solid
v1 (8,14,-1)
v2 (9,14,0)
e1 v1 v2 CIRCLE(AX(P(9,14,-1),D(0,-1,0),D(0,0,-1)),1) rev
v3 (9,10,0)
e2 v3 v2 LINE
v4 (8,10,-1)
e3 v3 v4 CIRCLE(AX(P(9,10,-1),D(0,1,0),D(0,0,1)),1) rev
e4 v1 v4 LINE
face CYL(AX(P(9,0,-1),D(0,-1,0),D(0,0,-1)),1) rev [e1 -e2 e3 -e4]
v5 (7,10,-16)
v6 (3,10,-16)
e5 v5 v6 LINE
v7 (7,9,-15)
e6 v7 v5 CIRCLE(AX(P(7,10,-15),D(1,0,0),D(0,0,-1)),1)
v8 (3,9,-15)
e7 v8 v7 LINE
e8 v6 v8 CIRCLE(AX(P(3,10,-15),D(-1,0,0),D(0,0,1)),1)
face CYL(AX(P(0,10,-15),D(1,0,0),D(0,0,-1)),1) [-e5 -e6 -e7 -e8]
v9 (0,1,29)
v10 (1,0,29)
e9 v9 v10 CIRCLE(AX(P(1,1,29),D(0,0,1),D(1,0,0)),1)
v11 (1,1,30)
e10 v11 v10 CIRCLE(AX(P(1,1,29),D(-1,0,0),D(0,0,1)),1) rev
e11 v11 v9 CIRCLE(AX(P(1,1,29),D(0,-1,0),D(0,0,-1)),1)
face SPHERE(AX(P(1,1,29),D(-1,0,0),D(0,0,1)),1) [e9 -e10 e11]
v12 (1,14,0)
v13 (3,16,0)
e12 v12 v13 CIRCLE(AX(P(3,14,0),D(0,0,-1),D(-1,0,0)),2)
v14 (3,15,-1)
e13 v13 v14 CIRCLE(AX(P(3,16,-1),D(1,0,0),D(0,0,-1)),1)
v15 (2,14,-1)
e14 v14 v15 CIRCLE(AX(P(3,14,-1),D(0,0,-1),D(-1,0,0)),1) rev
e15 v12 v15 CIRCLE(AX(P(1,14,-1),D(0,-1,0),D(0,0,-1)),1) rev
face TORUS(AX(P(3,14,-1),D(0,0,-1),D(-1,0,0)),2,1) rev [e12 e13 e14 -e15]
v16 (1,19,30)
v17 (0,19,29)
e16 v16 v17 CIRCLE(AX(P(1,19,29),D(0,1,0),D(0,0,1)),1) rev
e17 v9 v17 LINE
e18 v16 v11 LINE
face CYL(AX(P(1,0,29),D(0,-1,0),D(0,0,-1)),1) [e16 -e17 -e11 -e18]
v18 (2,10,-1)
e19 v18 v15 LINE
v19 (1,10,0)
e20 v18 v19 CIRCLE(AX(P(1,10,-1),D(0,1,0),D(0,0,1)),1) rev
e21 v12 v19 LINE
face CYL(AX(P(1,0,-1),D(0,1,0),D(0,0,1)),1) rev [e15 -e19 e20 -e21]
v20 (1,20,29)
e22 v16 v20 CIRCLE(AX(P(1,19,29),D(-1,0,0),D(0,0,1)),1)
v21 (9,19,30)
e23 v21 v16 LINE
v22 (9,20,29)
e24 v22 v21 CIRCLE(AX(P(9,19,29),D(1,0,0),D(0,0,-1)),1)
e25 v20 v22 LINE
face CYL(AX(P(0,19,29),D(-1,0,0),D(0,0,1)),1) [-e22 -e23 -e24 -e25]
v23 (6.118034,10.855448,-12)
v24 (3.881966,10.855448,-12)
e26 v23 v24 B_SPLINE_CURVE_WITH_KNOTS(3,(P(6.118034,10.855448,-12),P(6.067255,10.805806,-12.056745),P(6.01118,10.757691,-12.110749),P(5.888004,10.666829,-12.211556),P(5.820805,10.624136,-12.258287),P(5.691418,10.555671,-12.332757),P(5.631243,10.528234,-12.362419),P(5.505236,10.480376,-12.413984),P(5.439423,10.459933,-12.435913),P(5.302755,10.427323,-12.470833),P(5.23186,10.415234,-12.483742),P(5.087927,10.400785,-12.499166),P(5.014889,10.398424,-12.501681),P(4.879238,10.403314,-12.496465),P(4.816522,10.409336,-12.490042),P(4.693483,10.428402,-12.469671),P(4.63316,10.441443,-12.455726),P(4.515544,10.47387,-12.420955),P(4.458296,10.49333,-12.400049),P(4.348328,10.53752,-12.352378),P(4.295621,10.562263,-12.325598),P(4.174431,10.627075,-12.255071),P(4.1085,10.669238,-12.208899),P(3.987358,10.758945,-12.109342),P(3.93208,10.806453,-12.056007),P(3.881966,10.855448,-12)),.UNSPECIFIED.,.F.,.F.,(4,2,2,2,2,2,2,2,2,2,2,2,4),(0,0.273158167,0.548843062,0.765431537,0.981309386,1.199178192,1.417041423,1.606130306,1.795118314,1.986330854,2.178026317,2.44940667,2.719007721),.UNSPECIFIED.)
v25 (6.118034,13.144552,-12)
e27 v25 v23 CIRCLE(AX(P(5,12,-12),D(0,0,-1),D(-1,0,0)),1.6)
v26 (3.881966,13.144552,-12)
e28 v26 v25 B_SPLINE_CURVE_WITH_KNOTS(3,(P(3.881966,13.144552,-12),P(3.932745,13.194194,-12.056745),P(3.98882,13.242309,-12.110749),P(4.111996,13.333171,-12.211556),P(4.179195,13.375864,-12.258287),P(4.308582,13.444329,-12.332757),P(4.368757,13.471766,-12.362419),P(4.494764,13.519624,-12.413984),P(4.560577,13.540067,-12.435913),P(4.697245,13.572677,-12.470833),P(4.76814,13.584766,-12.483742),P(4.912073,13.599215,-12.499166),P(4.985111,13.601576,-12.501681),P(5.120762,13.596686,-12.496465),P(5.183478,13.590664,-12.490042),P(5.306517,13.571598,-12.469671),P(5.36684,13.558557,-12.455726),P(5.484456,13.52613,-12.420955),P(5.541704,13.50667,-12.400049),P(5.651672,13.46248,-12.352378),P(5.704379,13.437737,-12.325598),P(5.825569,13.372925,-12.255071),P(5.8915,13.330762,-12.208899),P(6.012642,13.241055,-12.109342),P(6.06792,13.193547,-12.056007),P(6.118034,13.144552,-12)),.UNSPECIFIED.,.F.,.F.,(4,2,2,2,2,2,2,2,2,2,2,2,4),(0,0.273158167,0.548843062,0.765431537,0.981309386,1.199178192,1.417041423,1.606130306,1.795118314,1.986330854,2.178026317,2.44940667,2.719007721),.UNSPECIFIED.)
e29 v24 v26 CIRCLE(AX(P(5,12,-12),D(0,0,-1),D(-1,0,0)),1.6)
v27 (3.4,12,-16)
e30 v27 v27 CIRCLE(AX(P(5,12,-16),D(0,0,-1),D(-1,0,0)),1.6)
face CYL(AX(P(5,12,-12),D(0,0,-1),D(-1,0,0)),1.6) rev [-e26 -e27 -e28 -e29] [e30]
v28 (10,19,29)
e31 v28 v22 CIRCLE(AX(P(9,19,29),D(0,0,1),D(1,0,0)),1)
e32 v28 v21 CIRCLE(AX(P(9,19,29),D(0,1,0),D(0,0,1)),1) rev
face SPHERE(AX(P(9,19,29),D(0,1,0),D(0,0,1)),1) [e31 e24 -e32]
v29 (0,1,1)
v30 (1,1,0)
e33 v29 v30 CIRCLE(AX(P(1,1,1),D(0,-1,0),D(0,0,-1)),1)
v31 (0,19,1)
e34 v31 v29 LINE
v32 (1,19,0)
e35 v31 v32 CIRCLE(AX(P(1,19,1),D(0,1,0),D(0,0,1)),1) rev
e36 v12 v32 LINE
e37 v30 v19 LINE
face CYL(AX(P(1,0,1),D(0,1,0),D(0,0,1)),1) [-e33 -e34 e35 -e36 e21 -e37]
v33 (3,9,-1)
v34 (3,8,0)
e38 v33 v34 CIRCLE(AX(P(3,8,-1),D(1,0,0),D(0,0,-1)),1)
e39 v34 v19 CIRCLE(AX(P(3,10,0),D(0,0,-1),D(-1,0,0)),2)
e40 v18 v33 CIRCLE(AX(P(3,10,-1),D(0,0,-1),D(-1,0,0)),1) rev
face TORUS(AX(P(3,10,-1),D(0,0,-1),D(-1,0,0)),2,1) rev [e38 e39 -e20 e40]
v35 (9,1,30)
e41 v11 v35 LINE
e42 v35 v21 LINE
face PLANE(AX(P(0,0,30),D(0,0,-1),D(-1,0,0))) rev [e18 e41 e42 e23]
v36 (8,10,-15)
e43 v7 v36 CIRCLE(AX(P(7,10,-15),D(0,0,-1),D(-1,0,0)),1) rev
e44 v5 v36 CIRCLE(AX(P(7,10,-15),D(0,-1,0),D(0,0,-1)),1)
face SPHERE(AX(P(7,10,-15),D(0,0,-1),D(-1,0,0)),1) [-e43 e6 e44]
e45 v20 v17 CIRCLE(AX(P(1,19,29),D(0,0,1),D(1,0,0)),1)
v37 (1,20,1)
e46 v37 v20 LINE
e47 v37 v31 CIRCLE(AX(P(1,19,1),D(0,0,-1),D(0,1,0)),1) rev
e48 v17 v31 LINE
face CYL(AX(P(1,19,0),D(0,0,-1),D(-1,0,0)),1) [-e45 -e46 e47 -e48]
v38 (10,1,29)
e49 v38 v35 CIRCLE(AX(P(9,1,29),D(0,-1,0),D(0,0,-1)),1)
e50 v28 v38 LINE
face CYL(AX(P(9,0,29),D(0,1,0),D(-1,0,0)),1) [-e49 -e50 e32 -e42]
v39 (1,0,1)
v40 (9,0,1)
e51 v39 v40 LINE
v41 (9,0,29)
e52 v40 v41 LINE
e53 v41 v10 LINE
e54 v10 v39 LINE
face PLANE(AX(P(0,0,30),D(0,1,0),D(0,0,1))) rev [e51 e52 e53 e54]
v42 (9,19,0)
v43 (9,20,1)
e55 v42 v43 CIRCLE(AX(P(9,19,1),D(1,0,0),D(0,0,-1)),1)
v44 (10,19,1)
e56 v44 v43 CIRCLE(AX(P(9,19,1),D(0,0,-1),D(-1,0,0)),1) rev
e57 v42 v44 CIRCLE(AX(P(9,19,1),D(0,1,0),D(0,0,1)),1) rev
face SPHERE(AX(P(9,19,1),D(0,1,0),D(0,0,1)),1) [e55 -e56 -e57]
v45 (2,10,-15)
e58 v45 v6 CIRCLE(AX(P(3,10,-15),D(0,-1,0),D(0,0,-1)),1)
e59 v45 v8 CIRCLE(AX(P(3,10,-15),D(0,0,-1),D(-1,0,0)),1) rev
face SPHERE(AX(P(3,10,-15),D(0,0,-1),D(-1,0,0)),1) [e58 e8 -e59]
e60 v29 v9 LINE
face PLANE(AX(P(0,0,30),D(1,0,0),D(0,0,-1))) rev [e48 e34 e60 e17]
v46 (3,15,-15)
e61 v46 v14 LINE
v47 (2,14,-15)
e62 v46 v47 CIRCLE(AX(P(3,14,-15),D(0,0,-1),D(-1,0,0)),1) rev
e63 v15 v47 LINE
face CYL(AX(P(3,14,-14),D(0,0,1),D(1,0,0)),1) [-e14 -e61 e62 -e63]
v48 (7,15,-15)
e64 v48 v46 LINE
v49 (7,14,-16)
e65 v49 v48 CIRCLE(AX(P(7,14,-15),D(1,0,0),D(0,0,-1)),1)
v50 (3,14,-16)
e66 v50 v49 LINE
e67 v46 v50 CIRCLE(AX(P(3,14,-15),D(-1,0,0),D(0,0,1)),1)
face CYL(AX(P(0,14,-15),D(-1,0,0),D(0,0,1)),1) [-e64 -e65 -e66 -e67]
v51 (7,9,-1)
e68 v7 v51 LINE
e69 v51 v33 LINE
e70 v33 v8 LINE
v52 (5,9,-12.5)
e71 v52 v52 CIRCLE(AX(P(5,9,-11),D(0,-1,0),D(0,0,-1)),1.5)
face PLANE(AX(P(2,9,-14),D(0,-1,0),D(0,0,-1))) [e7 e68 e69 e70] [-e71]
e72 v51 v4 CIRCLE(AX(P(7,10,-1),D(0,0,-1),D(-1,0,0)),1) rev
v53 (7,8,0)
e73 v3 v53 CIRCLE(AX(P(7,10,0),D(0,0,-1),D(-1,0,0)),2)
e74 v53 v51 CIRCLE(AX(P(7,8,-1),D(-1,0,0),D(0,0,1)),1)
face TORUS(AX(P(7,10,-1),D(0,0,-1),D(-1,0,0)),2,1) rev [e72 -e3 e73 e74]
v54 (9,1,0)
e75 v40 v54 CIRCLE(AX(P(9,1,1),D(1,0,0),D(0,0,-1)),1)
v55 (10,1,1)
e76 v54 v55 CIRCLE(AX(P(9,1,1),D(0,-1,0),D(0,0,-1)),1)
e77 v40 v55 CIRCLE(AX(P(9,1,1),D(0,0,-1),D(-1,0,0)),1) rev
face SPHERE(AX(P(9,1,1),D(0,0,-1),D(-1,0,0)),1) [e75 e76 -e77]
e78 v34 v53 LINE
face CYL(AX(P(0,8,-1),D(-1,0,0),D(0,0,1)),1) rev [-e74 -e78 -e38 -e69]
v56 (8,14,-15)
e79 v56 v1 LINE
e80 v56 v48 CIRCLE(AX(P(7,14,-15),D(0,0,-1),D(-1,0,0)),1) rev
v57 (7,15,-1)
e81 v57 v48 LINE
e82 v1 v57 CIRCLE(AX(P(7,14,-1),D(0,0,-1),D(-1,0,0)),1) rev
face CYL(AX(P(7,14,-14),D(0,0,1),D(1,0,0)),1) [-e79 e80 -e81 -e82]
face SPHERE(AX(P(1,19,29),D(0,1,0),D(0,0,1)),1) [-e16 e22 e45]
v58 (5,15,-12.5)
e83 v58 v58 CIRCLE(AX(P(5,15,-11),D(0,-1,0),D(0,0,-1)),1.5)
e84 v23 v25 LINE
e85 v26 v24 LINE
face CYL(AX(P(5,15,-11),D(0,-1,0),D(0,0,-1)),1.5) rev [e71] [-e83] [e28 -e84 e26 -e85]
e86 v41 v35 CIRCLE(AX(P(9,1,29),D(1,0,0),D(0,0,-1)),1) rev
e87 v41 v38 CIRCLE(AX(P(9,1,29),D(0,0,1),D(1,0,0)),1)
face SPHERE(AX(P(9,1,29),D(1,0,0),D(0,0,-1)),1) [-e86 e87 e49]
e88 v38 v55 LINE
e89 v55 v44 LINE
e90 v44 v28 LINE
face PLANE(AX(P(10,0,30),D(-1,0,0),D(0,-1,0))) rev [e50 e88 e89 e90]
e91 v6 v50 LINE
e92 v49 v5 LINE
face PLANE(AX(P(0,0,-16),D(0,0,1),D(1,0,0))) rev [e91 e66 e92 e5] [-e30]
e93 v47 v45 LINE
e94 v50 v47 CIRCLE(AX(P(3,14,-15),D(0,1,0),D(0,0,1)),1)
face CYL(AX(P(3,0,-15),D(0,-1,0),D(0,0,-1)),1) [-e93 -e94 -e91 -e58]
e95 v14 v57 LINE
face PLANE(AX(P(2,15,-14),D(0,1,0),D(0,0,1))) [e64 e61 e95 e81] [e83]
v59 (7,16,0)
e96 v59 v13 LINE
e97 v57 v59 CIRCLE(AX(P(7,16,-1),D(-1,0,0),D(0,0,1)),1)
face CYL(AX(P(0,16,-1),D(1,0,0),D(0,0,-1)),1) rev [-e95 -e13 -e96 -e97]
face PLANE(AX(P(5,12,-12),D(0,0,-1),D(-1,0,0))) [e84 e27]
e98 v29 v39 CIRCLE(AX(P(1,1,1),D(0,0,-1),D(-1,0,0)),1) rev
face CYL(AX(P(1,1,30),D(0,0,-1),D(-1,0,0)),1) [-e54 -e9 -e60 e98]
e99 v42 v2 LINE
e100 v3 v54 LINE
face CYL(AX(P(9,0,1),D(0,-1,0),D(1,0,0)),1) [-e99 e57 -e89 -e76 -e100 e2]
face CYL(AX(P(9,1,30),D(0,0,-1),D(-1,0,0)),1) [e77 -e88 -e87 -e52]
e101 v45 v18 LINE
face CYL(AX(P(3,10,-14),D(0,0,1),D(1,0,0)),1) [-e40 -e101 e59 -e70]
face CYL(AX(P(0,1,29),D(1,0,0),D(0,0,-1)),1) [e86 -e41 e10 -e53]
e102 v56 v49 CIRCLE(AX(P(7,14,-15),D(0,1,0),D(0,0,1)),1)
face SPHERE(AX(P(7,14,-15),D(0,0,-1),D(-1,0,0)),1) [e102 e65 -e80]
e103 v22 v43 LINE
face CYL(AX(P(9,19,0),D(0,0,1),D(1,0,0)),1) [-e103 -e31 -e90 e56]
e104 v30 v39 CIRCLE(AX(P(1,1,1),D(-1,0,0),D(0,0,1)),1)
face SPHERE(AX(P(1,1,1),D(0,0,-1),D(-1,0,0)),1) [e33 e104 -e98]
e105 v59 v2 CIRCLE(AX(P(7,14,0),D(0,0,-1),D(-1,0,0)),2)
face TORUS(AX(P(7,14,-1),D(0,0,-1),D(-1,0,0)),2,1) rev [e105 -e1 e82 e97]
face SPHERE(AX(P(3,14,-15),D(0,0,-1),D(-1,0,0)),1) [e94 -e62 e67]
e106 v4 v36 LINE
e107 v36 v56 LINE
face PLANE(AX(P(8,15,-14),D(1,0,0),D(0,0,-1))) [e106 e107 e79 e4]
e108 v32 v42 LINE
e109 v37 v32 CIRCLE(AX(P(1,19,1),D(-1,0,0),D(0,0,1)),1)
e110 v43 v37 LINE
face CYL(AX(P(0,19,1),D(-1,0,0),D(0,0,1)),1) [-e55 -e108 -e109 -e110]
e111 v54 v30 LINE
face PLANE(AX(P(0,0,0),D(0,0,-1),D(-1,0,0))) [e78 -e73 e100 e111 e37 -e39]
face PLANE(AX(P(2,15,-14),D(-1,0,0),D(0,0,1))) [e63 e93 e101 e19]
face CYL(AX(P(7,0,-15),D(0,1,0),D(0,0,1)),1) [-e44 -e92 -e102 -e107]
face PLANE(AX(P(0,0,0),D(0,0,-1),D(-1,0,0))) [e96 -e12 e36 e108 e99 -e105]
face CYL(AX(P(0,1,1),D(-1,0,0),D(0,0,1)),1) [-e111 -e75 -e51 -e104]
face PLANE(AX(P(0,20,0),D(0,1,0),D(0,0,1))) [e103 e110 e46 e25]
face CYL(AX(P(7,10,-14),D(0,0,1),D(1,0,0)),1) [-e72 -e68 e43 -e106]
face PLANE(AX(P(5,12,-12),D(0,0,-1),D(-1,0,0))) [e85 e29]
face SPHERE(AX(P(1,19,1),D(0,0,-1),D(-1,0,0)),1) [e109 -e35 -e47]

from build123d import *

# Parameters (mm, degrees)
SKETCH_1_W          = 10
SKETCH_1_H          = 22
EXTRUDE_1_DEPTH     = 30
SKETCH_2_W          = 6
SKETCH_2_H          = 6
EXTRUDE_3_DEPTH     = 14
SKETCH_3_R          = 1.5
CUT_EXTRUDE_1_DEPTH = 6
SKETCH_6_W          = 10
SKETCH_6_H          = 30
CUT_EXTRUDE_2_DEPTH = 2
SKETCH_7_W          = 6
SKETCH_7_H          = 6
EXTRUDE_4_DEPTH     = 2
FILLET_1_R          = 1
SKETCH_8_R          = 1.6
CUT_EXTRUDE_3_DEPTH = 4


with BuildPart() as part:
    # 草图1 → 凸台-拉伸1 (new body)
    with BuildSketch(Plane.XY):
        with Locations((5, 11)):
            Rectangle(SKETCH_1_W, SKETCH_1_H)
    extrude(amount=EXTRUDE_1_DEPTH)

    # 草图2 → 凸台-拉伸3 (add)
    with BuildSketch(Plane.XY):
        with Locations((5, 12)):
            Rectangle(SKETCH_2_W, SKETCH_2_H)
    extrude(amount=-EXTRUDE_3_DEPTH)

    # 草图3 → 切除-拉伸1 (cut)
    with BuildSketch(Plane(origin=(0, 9, 0), x_dir=(-1, 0, 0), z_dir=(0, -1, 0))):
        with Locations(Location((-5, 11, 0), (0, 0, 90))):
            Circle(SKETCH_3_R)
    extrude(amount=-CUT_EXTRUDE_1_DEPTH, mode=Mode.SUBTRACT)

    # 草图6 → 切除-拉伸2 (cut)
    with BuildSketch(Plane(origin=(0, 22, 0), x_dir=(1, 0, 0), z_dir=(0, 1, 0))):
        with Locations((5, -15)):
            Rectangle(SKETCH_6_W, SKETCH_6_H)
    extrude(amount=-CUT_EXTRUDE_2_DEPTH, mode=Mode.SUBTRACT)

    # 草图7 → 凸台-拉伸4 (add)
    with BuildSketch(Plane(origin=(0, 0, -14), x_dir=(-1, 0, 0), z_dir=(0, 0, -1))):
        with Locations((-5, 12)):
            Rectangle(SKETCH_7_W, SKETCH_7_H)
    extrude(amount=EXTRUDE_4_DEPTH)

    # 圆角1
    fillet_1_edges = [part.edges().sort_by_distance(p)[0] for p in [
        (10, 10, 30),
        (2, 9, -8),
        (2, 15, -8),
        (8, 15, -8),
        (8, 9, -8),
        (2, 12, 0),
        (5, 9, 0),
        (8, 12, 0),
        (5, 15, 0),
        (0, 10, 30),
        (0, 10, 0),
        (0, 20, 15),
        (5, 20, 0),
        (10, 20, 15),
        (5, 20, 30),
        (2, 12, -16),
        (5, 15, -16),
        (8, 12, -16),
        (5, 9, -16),
        (10, 10, 0),
        (5, 0, 0),
        (10, 0, 15),
        (0, 0, 15),
        (5, 0, 30),
    ]]
    fillet(fillet_1_edges, radius=FILLET_1_R - 0.0001)  # a hair under: the kernel refuses the full size

    # 草图8 → 切除-拉伸3 (cut)
    with BuildSketch(Plane(origin=(0, 0, -16), x_dir=(-1, 0, 0), z_dir=(0, 0, -1))):
        with Locations((-5, 12)):
            Circle(SKETCH_8_R)
    extrude(amount=-CUT_EXTRUDE_3_DEPTH, mode=Mode.SUBTRACT)


solid = part.part
